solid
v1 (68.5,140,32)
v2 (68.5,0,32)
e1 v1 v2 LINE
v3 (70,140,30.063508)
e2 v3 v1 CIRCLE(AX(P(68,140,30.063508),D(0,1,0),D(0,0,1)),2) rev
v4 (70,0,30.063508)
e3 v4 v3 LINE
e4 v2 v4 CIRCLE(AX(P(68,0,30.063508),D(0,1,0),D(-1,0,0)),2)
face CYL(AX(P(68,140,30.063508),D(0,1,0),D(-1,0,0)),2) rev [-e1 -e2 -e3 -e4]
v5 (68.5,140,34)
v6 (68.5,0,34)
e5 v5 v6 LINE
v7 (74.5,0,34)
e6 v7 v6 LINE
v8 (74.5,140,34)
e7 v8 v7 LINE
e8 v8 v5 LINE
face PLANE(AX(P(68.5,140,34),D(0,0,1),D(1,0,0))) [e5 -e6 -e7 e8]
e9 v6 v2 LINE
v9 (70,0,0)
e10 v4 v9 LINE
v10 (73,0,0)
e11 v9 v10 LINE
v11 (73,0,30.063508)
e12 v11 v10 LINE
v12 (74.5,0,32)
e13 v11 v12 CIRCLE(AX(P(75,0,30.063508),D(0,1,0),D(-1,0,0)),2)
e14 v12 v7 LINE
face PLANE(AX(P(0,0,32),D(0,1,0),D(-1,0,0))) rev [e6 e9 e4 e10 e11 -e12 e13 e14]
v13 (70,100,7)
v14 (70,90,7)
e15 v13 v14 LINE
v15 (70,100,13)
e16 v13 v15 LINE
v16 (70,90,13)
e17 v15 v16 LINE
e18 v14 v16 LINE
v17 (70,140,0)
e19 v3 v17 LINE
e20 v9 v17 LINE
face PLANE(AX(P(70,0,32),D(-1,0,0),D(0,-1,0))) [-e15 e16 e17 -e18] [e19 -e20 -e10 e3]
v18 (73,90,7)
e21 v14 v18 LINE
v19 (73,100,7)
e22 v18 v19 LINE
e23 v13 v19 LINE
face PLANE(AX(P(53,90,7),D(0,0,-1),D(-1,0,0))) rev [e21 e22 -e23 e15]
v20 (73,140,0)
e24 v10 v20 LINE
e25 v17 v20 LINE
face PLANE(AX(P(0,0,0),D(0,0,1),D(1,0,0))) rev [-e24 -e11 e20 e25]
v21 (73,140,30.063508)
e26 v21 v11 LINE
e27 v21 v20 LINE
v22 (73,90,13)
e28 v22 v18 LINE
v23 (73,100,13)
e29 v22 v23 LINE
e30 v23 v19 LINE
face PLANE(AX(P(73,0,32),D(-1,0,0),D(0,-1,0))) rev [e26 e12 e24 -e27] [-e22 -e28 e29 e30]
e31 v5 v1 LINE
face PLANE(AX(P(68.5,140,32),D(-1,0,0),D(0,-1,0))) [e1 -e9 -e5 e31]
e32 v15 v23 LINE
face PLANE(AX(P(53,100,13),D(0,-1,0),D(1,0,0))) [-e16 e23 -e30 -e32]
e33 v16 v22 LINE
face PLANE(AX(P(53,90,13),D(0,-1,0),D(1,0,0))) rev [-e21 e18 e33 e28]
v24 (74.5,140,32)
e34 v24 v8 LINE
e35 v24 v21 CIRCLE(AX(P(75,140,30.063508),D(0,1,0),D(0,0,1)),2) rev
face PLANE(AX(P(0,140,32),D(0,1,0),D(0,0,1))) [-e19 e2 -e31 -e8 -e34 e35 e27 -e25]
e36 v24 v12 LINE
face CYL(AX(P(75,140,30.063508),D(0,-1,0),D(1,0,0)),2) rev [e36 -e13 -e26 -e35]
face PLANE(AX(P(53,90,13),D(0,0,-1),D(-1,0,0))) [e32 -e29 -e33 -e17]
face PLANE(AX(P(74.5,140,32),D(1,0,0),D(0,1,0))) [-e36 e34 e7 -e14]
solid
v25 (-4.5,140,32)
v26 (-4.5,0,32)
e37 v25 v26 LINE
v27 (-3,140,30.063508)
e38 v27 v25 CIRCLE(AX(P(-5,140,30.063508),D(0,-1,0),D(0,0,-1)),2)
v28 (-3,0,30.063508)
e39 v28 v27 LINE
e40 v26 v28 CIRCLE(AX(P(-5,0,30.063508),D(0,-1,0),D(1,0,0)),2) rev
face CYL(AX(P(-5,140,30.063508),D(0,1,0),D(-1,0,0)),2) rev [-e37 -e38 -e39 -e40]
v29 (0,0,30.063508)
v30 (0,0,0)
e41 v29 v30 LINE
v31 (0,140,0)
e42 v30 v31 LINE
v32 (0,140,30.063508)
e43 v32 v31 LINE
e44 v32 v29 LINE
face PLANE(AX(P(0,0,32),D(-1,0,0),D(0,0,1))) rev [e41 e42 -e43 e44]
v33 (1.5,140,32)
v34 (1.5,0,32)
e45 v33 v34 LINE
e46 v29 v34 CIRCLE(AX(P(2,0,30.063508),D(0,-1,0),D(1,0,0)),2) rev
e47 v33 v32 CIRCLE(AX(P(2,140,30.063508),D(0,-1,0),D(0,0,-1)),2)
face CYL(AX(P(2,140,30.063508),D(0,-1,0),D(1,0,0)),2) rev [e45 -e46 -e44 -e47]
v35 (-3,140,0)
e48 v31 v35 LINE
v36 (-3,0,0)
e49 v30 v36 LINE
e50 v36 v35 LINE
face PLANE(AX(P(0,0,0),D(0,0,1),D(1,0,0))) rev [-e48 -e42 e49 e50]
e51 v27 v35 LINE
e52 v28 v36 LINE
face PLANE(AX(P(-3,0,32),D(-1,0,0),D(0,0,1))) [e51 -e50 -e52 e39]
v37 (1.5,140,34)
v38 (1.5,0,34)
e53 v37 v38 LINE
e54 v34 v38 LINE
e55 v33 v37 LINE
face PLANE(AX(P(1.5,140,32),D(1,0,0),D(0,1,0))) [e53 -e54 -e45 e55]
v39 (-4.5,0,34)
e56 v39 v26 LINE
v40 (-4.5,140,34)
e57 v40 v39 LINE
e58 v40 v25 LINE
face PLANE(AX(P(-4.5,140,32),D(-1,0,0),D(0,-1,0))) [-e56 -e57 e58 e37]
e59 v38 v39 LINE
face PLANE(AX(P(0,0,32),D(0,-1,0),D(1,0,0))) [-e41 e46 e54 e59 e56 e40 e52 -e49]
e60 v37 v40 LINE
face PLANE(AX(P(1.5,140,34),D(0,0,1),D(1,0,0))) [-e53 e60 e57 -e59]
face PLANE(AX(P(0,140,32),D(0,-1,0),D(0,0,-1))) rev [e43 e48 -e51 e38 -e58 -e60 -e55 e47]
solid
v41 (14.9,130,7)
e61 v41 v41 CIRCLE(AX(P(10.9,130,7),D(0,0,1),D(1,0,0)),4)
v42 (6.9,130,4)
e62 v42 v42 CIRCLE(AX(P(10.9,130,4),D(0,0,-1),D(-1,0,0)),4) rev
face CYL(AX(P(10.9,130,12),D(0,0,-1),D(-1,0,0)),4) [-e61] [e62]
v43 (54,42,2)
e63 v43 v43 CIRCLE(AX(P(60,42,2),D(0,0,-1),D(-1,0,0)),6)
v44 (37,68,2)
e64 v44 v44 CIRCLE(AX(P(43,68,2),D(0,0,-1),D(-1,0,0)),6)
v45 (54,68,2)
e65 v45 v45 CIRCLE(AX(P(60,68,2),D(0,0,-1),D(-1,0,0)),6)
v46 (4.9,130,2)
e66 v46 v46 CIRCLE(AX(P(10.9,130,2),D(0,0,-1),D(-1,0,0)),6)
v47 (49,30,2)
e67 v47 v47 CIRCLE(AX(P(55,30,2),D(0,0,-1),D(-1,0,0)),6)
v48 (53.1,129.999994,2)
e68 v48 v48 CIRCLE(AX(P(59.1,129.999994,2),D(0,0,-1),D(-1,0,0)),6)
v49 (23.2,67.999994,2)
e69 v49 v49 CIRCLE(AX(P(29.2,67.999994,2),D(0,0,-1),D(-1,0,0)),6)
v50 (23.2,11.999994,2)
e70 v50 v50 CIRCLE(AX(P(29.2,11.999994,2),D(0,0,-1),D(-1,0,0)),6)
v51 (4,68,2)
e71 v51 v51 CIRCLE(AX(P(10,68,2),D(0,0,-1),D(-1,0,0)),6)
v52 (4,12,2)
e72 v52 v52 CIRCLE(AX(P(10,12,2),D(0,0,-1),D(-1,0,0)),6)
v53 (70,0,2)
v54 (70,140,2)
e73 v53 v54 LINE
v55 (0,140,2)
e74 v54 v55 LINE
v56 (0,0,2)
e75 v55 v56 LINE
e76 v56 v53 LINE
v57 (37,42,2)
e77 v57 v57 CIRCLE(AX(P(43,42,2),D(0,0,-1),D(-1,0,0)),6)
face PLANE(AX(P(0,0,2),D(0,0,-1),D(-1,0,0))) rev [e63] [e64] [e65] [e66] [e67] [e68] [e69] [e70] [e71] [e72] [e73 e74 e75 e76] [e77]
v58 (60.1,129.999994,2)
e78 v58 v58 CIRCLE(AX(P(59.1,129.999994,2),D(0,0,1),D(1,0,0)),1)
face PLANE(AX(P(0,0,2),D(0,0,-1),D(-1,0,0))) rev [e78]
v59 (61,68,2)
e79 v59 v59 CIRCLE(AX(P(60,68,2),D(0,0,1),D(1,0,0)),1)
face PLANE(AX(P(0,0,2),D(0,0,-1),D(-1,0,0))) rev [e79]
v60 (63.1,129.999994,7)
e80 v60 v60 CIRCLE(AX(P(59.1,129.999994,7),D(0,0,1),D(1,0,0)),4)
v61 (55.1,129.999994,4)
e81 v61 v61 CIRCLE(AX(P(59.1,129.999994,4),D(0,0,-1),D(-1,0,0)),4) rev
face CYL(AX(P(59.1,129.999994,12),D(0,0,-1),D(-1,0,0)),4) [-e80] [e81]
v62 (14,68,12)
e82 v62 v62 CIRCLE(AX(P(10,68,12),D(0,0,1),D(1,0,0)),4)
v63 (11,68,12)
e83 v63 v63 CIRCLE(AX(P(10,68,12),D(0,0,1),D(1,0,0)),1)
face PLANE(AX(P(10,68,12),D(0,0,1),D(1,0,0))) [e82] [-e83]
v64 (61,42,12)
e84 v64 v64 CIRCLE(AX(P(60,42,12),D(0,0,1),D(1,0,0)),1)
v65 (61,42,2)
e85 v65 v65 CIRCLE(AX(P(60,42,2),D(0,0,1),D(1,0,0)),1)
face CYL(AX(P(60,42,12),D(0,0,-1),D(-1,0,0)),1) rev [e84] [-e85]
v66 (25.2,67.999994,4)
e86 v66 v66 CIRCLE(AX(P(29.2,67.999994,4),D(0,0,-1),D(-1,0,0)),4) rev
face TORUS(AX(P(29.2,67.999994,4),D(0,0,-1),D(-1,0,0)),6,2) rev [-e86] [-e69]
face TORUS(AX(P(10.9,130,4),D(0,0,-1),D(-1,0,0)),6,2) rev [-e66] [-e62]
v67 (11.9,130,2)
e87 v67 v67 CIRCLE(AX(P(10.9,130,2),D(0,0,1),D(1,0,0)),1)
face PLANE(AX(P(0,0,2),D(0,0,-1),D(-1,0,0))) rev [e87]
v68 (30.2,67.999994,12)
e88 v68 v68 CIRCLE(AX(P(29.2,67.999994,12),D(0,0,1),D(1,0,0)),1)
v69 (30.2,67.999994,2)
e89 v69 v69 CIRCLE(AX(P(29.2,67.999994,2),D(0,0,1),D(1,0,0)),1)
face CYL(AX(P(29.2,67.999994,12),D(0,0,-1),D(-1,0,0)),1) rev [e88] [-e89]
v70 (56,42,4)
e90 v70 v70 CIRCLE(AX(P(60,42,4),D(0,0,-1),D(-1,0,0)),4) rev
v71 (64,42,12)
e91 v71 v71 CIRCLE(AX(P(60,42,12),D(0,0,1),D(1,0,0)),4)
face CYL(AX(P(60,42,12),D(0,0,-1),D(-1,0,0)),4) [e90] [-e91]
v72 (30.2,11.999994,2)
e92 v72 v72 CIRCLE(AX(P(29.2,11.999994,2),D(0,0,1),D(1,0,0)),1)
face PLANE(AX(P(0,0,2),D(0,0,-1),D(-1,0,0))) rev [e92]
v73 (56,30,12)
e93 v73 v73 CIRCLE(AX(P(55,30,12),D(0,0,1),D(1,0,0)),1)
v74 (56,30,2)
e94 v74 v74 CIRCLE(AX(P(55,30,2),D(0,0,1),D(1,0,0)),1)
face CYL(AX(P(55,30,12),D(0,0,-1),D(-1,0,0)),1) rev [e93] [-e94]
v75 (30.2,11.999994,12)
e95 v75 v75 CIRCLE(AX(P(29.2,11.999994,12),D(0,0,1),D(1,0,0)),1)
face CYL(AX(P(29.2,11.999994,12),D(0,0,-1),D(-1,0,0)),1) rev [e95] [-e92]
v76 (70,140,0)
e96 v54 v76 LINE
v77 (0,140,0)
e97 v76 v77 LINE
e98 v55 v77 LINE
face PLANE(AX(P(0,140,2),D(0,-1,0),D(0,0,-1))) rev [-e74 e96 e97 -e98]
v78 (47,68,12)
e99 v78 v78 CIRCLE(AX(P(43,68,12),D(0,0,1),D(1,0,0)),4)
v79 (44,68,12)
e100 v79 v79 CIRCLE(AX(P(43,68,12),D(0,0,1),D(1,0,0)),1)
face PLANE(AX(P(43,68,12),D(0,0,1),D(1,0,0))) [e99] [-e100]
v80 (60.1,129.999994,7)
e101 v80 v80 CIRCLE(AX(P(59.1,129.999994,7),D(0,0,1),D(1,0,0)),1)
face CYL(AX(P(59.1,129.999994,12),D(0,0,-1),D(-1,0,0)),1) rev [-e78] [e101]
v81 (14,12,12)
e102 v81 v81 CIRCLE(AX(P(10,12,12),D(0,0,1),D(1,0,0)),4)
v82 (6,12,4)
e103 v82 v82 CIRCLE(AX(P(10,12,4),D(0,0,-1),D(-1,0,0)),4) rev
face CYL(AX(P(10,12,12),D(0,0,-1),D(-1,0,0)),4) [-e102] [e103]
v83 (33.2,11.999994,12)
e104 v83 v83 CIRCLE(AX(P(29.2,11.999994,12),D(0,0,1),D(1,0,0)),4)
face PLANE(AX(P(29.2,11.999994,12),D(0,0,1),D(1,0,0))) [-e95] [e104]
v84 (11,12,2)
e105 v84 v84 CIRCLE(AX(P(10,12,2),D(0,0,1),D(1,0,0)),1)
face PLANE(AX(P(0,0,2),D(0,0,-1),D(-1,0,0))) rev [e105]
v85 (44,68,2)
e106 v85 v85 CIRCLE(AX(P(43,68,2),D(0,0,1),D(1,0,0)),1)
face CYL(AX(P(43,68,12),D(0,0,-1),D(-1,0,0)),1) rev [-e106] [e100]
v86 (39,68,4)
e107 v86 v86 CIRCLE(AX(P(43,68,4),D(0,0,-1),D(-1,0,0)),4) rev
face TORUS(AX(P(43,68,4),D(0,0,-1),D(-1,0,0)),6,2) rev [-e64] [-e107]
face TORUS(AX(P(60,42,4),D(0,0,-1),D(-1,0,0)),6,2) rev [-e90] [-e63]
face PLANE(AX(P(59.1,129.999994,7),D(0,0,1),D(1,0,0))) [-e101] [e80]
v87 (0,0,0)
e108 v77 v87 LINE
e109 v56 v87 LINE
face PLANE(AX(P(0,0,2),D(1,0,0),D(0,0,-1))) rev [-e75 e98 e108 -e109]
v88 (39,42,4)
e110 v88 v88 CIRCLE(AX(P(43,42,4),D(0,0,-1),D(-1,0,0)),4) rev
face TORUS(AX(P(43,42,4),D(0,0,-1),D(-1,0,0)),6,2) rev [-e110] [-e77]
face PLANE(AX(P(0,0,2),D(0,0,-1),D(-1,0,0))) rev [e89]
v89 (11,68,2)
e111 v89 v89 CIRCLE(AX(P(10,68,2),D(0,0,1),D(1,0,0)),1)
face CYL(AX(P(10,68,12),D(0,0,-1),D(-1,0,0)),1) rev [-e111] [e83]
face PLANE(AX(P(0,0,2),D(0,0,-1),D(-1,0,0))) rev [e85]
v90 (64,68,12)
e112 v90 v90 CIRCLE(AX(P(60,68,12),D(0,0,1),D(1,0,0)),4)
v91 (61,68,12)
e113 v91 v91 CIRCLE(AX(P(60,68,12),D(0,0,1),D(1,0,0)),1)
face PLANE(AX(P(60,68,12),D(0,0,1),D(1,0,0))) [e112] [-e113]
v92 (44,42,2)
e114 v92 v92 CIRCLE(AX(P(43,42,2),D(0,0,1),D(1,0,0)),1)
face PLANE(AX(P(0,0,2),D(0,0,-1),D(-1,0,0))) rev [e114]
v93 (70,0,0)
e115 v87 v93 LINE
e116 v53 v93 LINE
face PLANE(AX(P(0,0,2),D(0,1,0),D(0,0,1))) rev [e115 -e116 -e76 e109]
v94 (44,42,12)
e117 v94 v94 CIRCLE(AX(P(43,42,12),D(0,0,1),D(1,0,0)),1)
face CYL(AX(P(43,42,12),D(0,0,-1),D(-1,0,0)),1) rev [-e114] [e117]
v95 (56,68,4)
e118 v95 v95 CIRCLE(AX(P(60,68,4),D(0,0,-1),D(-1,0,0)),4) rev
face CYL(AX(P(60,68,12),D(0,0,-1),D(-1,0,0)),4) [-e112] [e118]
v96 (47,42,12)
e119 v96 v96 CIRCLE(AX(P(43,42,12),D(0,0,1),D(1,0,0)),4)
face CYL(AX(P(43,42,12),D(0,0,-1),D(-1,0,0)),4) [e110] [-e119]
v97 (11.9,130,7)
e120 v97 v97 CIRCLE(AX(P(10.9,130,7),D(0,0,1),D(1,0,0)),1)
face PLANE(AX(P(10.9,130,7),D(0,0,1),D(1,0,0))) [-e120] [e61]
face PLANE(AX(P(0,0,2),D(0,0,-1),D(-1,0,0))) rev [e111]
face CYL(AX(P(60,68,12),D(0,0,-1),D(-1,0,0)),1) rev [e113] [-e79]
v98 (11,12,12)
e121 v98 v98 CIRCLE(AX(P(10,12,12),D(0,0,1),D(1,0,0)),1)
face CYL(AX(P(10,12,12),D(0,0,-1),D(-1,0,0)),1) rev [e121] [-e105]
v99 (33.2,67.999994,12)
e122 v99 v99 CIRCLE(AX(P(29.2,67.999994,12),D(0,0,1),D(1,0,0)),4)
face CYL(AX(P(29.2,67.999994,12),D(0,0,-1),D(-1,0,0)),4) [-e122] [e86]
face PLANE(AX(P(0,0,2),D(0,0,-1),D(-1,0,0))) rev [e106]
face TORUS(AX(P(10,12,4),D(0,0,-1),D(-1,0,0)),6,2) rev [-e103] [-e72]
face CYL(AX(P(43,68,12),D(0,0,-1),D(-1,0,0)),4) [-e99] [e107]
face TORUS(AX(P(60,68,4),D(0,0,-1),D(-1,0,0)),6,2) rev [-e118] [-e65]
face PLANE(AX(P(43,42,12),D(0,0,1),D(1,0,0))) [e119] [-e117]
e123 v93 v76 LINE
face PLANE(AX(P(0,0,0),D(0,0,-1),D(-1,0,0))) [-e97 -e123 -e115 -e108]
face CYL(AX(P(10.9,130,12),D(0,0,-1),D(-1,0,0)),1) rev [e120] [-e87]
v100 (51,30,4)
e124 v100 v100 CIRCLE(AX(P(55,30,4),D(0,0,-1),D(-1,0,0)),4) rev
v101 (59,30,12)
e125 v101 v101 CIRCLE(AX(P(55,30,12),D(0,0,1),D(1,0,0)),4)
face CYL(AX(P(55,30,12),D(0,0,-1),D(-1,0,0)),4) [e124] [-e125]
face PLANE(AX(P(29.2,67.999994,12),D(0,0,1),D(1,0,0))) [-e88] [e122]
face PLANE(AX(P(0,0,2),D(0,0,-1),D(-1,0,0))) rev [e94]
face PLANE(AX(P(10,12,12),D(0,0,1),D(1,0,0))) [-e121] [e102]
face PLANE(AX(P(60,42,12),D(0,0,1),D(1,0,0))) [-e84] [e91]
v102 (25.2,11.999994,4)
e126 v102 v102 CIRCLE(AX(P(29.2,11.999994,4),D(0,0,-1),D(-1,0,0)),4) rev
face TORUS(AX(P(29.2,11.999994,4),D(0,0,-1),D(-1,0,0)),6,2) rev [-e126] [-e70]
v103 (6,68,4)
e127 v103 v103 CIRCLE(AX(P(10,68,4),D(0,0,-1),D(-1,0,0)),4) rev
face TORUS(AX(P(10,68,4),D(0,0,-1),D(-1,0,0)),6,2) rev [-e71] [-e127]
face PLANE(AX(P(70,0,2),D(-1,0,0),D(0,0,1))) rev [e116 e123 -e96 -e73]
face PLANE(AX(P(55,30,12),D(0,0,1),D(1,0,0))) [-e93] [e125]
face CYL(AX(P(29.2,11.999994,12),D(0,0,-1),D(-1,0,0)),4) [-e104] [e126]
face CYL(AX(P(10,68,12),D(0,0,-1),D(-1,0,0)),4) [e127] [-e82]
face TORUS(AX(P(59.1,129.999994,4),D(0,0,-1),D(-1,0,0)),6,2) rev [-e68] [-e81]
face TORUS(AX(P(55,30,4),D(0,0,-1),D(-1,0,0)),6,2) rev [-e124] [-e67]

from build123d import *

# Parameters (mm, degrees)
SKICA1_W                  = 70
SKICA1_H                  = 140
P_IDAT_VYSUNUT_M1_DEPTH   = 2
SKICA2_R                  = 4
SKICA2_R_2                = 1
P_IDAT_VYSUNUT_M2_DEPTH   = 10
SKICA4_W                  = 3
SKICA4_H                  = 140
P_IDAT_VYSUNUT_M3_DEPTH   = 32
P_IDAT_VYSUNUT_M3_2_DEPTH = 32
SKICA5_W                  = 6
SKICA5_H                  = 10
ODEBRAT_VYSUNUT_M2_DEPTH  = 20
ODEBRAT_START             = -5
SKICA6_R                  = 4
ODEBRAT_VYSUNUT_M3_DEPTH  = 5
ZAOBLIT1_R                = 2
SKICA7_W                  = 6
SKICA7_H                  = 2
P_IDAT_VYSUNUT_M4_DEPTH   = 140
ZAOBLIT2_R                = 2
ZAOBLIT3_R                = 2


with BuildPart() as part:
    # Skica1 → Přidat vysunutím1 (new body)
    with BuildSketch(Plane.XY):
        with Locations((35, 70)):
            Rectangle(SKICA1_W, SKICA1_H)
    extrude(amount=P_IDAT_VYSUNUT_M1_DEPTH)

    # Skica2 → Přidat vysunutím2 (add)
    # profile 1 of 11: a face of its own
    with BuildSketch(Plane.XY.offset(2)):
        with Locations(Location((10, 68, 0), (0, 0, 180))):
            Circle(SKICA2_R)
        with Locations((10, 68)):
            Circle(SKICA2_R_2, mode=Mode.SUBTRACT)
    # profile 2 of 11: a face of its own
    with BuildSketch(Plane.XY.offset(2)):
        with Locations(Location((29.2, 67.999993937, 0), (0, 0, 180))):
            Circle(SKICA2_R)
        with Locations((29.2, 67.999993937)):
            Circle(SKICA2_R_2, mode=Mode.SUBTRACT)
    # profile 3 of 11: a face of its own
    with BuildSketch(Plane.XY.offset(2)):
        with Locations(Location((43, 68, 0), (0, 0, 180))):
            Circle(SKICA2_R)
        with Locations((43, 68)):
            Circle(SKICA2_R_2, mode=Mode.SUBTRACT)
    # profile 4 of 11: a face of its own
    with BuildSketch(Plane.XY.offset(2)):
        with Locations(Location((60, 68, 0), (0, 0, 180))):
            Circle(SKICA2_R)
        with Locations((60, 68)):
            Circle(SKICA2_R_2, mode=Mode.SUBTRACT)
    # profile 5 of 11: a face of its own
    with BuildSketch(Plane.XY.offset(2)):
        with Locations(Location((60, 42, 0), (0, 0, 180))):
            Circle(SKICA2_R)
        with Locations((60, 42)):
            Circle(SKICA2_R_2, mode=Mode.SUBTRACT)
    # profile 6 of 11: a face of its own
    with BuildSketch(Plane.XY.offset(2)):
        with Locations(Location((55, 30, 0), (0, 0, 180))):
            Circle(SKICA2_R)
        with Locations((55, 30)):
            Circle(SKICA2_R_2, mode=Mode.SUBTRACT)
    # profile 7 of 11: a face of its own
    with BuildSketch(Plane.XY.offset(2)):
        with Locations(Location((29.2, 11.999993937, 0), (0, 0, 180))):
            Circle(SKICA2_R)
        with Locations((29.2, 11.999993937)):
            Circle(SKICA2_R_2, mode=Mode.SUBTRACT)
    # profile 8 of 11: a face of its own
    with BuildSketch(Plane.XY.offset(2)):
        with Locations(Location((10, 12, 0), (0, 0, 180))):
            Circle(SKICA2_R)
        with Locations((10, 12)):
            Circle(SKICA2_R_2, mode=Mode.SUBTRACT)
    # profile 9 of 11: a face of its own
    with BuildSketch(Plane.XY.offset(2)):
        with Locations(Location((10.9, 130, 0), (0, 0, 180))):
            Circle(SKICA2_R)
        with Locations((10.9, 130)):
            Circle(SKICA2_R_2, mode=Mode.SUBTRACT)
    # profile 10 of 11: a face of its own
    with BuildSketch(Plane.XY.offset(2)):
        with Locations(Location((59.1, 129.999993937, 0), (0, 0, 180))):
            Circle(SKICA2_R)
        with Locations((59.1, 129.999993937)):
            Circle(SKICA2_R_2, mode=Mode.SUBTRACT)
    # profile 11 of 11: a face of its own
    with BuildSketch(Plane.XY.offset(2)):
        with Locations(Location((43, 42, 0), (0, 0, 180))):
            Circle(SKICA2_R)
        with Locations((43, 42)):
            Circle(SKICA2_R_2, mode=Mode.SUBTRACT)
    extrude(amount=P_IDAT_VYSUNUT_M2_DEPTH)

    # Skica6 → Odebrat vysunutím3 (cut)
    with BuildSketch(Plane.XY.offset(12).offset(ODEBRAT_START)):
        with Locations(Location((10.9, 130, 0), (0, 0, 180))):
            Circle(SKICA6_R)
        with Locations(Location((59.1, 129.999993937, 0), (0, 0, 180))):
            Circle(SKICA6_R)
    extrude(amount=ODEBRAT_VYSUNUT_M3_DEPTH, mode=Mode.SUBTRACT)

    # Zaoblit1
    zaoblit1_edges = [part.edges().sort_by_distance(p)[0] for p in [
        (14, 68, 2),
        (33.2, 67.999993937, 2),
        (47, 68, 2),
        (64, 68, 2),
        (64, 42, 2),
        (59, 30, 2),
        (33.2, 11.999993937, 2),
        (14, 12, 2),
        (14.9, 130, 2),
        (63.1, 129.999993937, 2),
        (47, 42, 2),
    ]]
    fillet(zaoblit1_edges, radius=ZAOBLIT1_R)


with BuildPart() as body_2:
    # Skica4 → Přidat vysunutím3 (new body)
    with BuildSketch(Plane.XY):
        with Locations((-1.5, 70)):
            Rectangle(SKICA4_W, SKICA4_H)
    extrude(amount=P_IDAT_VYSUNUT_M3_DEPTH)



with BuildPart() as body_3:
    # Skica4 → P_idat vysunut_m3 2 (new body)
    with BuildSketch(Plane.XY):
        with Locations((71.5, 70)):
            Rectangle(SKICA4_W, SKICA4_H)
    extrude(amount=P_IDAT_VYSUNUT_M3_2_DEPTH)

    # Skica5 → Odebrat vysunutím2 (cut)
    with BuildSketch(Plane(origin=(73, 0, 0), x_dir=(0, 0, -1), z_dir=(1, 0, 0))):
        with Locations((-10, 95)):
            Rectangle(SKICA5_W, SKICA5_H)
    extrude(amount=-ODEBRAT_VYSUNUT_M2_DEPTH, mode=Mode.SUBTRACT)


with BuildPart() as body_2_1:
    add(body_2.part)

    add(body_3.part)  # Přidat vysunutím4 merges body 3
    # Skica7 → Přidat vysunutím4 (add)
    with BuildSketch(Plane.XZ):
        with Locations((-1.5, 33)):
            Rectangle(SKICA7_W, SKICA7_H)
        with Locations((71.5, 33)):
            Rectangle(SKICA7_W, SKICA7_H)
    extrude(amount=-P_IDAT_VYSUNUT_M4_DEPTH)

    # Zaoblit2
    # the kernel refuses this fillet: 2 mm, written as the material it adds along each edge
    with BuildSketch(Plane(origin=(-3, 0, 32), x_dir=(-1, 0, 0), z_dir=(0, 1, 0)), Plane(origin=(0, 140, 32), x_dir=(1, 0, 0), z_dir=(0, -1, 0))) as zaoblit2_piece_1:
        with BuildLine():
            CenterArc((2, -1.936491673), ZAOBLIT2_R, 104.477512186, 75.522487814)
            Line((0, -1.936491673), (-0.04, -1.936491673))
            Line((-0.04, -1.936491673), (-0.04, 0))
            Line((-0.04, 0), (0, 0.04))
            ThreePointArc((0, 0.04), (0.75, 0.04), (1.49, 0.038729833))
            Line((1.49, 0.038729833), (1.5, 0))
        make_face()
    extrude(amount=140)

    # Zaoblit3
    # the kernel refuses this fillet: 2 mm, written as the material it adds along each edge
    with BuildSketch(Plane(origin=(73, 0, 32), x_dir=(1, 0, 0), z_dir=(0, 1, 0)), Plane(origin=(70, 140, 32), x_dir=(-1, 0, 0), z_dir=(0, -1, 0))) as zaoblit3_piece_1:
        with BuildLine():
            CenterArc((2, 1.936491673), ZAOBLIT3_R, 180, 75.522487814)
            Line((0, 1.936491673), (-0.04, 1.936491673))
            Line((-0.04, 1.936491673), (-0.04, 0))
            Line((-0.04, 0), (0, -0.04))
            ThreePointArc((0, -0.04), (0.75, -0.04), (1.49, -0.038729833))
            Line((1.49, -0.038729833), (1.5, 0))
        make_face()
    extrude(amount=140)


solid = Compound([part.part, body_2_1.part])
